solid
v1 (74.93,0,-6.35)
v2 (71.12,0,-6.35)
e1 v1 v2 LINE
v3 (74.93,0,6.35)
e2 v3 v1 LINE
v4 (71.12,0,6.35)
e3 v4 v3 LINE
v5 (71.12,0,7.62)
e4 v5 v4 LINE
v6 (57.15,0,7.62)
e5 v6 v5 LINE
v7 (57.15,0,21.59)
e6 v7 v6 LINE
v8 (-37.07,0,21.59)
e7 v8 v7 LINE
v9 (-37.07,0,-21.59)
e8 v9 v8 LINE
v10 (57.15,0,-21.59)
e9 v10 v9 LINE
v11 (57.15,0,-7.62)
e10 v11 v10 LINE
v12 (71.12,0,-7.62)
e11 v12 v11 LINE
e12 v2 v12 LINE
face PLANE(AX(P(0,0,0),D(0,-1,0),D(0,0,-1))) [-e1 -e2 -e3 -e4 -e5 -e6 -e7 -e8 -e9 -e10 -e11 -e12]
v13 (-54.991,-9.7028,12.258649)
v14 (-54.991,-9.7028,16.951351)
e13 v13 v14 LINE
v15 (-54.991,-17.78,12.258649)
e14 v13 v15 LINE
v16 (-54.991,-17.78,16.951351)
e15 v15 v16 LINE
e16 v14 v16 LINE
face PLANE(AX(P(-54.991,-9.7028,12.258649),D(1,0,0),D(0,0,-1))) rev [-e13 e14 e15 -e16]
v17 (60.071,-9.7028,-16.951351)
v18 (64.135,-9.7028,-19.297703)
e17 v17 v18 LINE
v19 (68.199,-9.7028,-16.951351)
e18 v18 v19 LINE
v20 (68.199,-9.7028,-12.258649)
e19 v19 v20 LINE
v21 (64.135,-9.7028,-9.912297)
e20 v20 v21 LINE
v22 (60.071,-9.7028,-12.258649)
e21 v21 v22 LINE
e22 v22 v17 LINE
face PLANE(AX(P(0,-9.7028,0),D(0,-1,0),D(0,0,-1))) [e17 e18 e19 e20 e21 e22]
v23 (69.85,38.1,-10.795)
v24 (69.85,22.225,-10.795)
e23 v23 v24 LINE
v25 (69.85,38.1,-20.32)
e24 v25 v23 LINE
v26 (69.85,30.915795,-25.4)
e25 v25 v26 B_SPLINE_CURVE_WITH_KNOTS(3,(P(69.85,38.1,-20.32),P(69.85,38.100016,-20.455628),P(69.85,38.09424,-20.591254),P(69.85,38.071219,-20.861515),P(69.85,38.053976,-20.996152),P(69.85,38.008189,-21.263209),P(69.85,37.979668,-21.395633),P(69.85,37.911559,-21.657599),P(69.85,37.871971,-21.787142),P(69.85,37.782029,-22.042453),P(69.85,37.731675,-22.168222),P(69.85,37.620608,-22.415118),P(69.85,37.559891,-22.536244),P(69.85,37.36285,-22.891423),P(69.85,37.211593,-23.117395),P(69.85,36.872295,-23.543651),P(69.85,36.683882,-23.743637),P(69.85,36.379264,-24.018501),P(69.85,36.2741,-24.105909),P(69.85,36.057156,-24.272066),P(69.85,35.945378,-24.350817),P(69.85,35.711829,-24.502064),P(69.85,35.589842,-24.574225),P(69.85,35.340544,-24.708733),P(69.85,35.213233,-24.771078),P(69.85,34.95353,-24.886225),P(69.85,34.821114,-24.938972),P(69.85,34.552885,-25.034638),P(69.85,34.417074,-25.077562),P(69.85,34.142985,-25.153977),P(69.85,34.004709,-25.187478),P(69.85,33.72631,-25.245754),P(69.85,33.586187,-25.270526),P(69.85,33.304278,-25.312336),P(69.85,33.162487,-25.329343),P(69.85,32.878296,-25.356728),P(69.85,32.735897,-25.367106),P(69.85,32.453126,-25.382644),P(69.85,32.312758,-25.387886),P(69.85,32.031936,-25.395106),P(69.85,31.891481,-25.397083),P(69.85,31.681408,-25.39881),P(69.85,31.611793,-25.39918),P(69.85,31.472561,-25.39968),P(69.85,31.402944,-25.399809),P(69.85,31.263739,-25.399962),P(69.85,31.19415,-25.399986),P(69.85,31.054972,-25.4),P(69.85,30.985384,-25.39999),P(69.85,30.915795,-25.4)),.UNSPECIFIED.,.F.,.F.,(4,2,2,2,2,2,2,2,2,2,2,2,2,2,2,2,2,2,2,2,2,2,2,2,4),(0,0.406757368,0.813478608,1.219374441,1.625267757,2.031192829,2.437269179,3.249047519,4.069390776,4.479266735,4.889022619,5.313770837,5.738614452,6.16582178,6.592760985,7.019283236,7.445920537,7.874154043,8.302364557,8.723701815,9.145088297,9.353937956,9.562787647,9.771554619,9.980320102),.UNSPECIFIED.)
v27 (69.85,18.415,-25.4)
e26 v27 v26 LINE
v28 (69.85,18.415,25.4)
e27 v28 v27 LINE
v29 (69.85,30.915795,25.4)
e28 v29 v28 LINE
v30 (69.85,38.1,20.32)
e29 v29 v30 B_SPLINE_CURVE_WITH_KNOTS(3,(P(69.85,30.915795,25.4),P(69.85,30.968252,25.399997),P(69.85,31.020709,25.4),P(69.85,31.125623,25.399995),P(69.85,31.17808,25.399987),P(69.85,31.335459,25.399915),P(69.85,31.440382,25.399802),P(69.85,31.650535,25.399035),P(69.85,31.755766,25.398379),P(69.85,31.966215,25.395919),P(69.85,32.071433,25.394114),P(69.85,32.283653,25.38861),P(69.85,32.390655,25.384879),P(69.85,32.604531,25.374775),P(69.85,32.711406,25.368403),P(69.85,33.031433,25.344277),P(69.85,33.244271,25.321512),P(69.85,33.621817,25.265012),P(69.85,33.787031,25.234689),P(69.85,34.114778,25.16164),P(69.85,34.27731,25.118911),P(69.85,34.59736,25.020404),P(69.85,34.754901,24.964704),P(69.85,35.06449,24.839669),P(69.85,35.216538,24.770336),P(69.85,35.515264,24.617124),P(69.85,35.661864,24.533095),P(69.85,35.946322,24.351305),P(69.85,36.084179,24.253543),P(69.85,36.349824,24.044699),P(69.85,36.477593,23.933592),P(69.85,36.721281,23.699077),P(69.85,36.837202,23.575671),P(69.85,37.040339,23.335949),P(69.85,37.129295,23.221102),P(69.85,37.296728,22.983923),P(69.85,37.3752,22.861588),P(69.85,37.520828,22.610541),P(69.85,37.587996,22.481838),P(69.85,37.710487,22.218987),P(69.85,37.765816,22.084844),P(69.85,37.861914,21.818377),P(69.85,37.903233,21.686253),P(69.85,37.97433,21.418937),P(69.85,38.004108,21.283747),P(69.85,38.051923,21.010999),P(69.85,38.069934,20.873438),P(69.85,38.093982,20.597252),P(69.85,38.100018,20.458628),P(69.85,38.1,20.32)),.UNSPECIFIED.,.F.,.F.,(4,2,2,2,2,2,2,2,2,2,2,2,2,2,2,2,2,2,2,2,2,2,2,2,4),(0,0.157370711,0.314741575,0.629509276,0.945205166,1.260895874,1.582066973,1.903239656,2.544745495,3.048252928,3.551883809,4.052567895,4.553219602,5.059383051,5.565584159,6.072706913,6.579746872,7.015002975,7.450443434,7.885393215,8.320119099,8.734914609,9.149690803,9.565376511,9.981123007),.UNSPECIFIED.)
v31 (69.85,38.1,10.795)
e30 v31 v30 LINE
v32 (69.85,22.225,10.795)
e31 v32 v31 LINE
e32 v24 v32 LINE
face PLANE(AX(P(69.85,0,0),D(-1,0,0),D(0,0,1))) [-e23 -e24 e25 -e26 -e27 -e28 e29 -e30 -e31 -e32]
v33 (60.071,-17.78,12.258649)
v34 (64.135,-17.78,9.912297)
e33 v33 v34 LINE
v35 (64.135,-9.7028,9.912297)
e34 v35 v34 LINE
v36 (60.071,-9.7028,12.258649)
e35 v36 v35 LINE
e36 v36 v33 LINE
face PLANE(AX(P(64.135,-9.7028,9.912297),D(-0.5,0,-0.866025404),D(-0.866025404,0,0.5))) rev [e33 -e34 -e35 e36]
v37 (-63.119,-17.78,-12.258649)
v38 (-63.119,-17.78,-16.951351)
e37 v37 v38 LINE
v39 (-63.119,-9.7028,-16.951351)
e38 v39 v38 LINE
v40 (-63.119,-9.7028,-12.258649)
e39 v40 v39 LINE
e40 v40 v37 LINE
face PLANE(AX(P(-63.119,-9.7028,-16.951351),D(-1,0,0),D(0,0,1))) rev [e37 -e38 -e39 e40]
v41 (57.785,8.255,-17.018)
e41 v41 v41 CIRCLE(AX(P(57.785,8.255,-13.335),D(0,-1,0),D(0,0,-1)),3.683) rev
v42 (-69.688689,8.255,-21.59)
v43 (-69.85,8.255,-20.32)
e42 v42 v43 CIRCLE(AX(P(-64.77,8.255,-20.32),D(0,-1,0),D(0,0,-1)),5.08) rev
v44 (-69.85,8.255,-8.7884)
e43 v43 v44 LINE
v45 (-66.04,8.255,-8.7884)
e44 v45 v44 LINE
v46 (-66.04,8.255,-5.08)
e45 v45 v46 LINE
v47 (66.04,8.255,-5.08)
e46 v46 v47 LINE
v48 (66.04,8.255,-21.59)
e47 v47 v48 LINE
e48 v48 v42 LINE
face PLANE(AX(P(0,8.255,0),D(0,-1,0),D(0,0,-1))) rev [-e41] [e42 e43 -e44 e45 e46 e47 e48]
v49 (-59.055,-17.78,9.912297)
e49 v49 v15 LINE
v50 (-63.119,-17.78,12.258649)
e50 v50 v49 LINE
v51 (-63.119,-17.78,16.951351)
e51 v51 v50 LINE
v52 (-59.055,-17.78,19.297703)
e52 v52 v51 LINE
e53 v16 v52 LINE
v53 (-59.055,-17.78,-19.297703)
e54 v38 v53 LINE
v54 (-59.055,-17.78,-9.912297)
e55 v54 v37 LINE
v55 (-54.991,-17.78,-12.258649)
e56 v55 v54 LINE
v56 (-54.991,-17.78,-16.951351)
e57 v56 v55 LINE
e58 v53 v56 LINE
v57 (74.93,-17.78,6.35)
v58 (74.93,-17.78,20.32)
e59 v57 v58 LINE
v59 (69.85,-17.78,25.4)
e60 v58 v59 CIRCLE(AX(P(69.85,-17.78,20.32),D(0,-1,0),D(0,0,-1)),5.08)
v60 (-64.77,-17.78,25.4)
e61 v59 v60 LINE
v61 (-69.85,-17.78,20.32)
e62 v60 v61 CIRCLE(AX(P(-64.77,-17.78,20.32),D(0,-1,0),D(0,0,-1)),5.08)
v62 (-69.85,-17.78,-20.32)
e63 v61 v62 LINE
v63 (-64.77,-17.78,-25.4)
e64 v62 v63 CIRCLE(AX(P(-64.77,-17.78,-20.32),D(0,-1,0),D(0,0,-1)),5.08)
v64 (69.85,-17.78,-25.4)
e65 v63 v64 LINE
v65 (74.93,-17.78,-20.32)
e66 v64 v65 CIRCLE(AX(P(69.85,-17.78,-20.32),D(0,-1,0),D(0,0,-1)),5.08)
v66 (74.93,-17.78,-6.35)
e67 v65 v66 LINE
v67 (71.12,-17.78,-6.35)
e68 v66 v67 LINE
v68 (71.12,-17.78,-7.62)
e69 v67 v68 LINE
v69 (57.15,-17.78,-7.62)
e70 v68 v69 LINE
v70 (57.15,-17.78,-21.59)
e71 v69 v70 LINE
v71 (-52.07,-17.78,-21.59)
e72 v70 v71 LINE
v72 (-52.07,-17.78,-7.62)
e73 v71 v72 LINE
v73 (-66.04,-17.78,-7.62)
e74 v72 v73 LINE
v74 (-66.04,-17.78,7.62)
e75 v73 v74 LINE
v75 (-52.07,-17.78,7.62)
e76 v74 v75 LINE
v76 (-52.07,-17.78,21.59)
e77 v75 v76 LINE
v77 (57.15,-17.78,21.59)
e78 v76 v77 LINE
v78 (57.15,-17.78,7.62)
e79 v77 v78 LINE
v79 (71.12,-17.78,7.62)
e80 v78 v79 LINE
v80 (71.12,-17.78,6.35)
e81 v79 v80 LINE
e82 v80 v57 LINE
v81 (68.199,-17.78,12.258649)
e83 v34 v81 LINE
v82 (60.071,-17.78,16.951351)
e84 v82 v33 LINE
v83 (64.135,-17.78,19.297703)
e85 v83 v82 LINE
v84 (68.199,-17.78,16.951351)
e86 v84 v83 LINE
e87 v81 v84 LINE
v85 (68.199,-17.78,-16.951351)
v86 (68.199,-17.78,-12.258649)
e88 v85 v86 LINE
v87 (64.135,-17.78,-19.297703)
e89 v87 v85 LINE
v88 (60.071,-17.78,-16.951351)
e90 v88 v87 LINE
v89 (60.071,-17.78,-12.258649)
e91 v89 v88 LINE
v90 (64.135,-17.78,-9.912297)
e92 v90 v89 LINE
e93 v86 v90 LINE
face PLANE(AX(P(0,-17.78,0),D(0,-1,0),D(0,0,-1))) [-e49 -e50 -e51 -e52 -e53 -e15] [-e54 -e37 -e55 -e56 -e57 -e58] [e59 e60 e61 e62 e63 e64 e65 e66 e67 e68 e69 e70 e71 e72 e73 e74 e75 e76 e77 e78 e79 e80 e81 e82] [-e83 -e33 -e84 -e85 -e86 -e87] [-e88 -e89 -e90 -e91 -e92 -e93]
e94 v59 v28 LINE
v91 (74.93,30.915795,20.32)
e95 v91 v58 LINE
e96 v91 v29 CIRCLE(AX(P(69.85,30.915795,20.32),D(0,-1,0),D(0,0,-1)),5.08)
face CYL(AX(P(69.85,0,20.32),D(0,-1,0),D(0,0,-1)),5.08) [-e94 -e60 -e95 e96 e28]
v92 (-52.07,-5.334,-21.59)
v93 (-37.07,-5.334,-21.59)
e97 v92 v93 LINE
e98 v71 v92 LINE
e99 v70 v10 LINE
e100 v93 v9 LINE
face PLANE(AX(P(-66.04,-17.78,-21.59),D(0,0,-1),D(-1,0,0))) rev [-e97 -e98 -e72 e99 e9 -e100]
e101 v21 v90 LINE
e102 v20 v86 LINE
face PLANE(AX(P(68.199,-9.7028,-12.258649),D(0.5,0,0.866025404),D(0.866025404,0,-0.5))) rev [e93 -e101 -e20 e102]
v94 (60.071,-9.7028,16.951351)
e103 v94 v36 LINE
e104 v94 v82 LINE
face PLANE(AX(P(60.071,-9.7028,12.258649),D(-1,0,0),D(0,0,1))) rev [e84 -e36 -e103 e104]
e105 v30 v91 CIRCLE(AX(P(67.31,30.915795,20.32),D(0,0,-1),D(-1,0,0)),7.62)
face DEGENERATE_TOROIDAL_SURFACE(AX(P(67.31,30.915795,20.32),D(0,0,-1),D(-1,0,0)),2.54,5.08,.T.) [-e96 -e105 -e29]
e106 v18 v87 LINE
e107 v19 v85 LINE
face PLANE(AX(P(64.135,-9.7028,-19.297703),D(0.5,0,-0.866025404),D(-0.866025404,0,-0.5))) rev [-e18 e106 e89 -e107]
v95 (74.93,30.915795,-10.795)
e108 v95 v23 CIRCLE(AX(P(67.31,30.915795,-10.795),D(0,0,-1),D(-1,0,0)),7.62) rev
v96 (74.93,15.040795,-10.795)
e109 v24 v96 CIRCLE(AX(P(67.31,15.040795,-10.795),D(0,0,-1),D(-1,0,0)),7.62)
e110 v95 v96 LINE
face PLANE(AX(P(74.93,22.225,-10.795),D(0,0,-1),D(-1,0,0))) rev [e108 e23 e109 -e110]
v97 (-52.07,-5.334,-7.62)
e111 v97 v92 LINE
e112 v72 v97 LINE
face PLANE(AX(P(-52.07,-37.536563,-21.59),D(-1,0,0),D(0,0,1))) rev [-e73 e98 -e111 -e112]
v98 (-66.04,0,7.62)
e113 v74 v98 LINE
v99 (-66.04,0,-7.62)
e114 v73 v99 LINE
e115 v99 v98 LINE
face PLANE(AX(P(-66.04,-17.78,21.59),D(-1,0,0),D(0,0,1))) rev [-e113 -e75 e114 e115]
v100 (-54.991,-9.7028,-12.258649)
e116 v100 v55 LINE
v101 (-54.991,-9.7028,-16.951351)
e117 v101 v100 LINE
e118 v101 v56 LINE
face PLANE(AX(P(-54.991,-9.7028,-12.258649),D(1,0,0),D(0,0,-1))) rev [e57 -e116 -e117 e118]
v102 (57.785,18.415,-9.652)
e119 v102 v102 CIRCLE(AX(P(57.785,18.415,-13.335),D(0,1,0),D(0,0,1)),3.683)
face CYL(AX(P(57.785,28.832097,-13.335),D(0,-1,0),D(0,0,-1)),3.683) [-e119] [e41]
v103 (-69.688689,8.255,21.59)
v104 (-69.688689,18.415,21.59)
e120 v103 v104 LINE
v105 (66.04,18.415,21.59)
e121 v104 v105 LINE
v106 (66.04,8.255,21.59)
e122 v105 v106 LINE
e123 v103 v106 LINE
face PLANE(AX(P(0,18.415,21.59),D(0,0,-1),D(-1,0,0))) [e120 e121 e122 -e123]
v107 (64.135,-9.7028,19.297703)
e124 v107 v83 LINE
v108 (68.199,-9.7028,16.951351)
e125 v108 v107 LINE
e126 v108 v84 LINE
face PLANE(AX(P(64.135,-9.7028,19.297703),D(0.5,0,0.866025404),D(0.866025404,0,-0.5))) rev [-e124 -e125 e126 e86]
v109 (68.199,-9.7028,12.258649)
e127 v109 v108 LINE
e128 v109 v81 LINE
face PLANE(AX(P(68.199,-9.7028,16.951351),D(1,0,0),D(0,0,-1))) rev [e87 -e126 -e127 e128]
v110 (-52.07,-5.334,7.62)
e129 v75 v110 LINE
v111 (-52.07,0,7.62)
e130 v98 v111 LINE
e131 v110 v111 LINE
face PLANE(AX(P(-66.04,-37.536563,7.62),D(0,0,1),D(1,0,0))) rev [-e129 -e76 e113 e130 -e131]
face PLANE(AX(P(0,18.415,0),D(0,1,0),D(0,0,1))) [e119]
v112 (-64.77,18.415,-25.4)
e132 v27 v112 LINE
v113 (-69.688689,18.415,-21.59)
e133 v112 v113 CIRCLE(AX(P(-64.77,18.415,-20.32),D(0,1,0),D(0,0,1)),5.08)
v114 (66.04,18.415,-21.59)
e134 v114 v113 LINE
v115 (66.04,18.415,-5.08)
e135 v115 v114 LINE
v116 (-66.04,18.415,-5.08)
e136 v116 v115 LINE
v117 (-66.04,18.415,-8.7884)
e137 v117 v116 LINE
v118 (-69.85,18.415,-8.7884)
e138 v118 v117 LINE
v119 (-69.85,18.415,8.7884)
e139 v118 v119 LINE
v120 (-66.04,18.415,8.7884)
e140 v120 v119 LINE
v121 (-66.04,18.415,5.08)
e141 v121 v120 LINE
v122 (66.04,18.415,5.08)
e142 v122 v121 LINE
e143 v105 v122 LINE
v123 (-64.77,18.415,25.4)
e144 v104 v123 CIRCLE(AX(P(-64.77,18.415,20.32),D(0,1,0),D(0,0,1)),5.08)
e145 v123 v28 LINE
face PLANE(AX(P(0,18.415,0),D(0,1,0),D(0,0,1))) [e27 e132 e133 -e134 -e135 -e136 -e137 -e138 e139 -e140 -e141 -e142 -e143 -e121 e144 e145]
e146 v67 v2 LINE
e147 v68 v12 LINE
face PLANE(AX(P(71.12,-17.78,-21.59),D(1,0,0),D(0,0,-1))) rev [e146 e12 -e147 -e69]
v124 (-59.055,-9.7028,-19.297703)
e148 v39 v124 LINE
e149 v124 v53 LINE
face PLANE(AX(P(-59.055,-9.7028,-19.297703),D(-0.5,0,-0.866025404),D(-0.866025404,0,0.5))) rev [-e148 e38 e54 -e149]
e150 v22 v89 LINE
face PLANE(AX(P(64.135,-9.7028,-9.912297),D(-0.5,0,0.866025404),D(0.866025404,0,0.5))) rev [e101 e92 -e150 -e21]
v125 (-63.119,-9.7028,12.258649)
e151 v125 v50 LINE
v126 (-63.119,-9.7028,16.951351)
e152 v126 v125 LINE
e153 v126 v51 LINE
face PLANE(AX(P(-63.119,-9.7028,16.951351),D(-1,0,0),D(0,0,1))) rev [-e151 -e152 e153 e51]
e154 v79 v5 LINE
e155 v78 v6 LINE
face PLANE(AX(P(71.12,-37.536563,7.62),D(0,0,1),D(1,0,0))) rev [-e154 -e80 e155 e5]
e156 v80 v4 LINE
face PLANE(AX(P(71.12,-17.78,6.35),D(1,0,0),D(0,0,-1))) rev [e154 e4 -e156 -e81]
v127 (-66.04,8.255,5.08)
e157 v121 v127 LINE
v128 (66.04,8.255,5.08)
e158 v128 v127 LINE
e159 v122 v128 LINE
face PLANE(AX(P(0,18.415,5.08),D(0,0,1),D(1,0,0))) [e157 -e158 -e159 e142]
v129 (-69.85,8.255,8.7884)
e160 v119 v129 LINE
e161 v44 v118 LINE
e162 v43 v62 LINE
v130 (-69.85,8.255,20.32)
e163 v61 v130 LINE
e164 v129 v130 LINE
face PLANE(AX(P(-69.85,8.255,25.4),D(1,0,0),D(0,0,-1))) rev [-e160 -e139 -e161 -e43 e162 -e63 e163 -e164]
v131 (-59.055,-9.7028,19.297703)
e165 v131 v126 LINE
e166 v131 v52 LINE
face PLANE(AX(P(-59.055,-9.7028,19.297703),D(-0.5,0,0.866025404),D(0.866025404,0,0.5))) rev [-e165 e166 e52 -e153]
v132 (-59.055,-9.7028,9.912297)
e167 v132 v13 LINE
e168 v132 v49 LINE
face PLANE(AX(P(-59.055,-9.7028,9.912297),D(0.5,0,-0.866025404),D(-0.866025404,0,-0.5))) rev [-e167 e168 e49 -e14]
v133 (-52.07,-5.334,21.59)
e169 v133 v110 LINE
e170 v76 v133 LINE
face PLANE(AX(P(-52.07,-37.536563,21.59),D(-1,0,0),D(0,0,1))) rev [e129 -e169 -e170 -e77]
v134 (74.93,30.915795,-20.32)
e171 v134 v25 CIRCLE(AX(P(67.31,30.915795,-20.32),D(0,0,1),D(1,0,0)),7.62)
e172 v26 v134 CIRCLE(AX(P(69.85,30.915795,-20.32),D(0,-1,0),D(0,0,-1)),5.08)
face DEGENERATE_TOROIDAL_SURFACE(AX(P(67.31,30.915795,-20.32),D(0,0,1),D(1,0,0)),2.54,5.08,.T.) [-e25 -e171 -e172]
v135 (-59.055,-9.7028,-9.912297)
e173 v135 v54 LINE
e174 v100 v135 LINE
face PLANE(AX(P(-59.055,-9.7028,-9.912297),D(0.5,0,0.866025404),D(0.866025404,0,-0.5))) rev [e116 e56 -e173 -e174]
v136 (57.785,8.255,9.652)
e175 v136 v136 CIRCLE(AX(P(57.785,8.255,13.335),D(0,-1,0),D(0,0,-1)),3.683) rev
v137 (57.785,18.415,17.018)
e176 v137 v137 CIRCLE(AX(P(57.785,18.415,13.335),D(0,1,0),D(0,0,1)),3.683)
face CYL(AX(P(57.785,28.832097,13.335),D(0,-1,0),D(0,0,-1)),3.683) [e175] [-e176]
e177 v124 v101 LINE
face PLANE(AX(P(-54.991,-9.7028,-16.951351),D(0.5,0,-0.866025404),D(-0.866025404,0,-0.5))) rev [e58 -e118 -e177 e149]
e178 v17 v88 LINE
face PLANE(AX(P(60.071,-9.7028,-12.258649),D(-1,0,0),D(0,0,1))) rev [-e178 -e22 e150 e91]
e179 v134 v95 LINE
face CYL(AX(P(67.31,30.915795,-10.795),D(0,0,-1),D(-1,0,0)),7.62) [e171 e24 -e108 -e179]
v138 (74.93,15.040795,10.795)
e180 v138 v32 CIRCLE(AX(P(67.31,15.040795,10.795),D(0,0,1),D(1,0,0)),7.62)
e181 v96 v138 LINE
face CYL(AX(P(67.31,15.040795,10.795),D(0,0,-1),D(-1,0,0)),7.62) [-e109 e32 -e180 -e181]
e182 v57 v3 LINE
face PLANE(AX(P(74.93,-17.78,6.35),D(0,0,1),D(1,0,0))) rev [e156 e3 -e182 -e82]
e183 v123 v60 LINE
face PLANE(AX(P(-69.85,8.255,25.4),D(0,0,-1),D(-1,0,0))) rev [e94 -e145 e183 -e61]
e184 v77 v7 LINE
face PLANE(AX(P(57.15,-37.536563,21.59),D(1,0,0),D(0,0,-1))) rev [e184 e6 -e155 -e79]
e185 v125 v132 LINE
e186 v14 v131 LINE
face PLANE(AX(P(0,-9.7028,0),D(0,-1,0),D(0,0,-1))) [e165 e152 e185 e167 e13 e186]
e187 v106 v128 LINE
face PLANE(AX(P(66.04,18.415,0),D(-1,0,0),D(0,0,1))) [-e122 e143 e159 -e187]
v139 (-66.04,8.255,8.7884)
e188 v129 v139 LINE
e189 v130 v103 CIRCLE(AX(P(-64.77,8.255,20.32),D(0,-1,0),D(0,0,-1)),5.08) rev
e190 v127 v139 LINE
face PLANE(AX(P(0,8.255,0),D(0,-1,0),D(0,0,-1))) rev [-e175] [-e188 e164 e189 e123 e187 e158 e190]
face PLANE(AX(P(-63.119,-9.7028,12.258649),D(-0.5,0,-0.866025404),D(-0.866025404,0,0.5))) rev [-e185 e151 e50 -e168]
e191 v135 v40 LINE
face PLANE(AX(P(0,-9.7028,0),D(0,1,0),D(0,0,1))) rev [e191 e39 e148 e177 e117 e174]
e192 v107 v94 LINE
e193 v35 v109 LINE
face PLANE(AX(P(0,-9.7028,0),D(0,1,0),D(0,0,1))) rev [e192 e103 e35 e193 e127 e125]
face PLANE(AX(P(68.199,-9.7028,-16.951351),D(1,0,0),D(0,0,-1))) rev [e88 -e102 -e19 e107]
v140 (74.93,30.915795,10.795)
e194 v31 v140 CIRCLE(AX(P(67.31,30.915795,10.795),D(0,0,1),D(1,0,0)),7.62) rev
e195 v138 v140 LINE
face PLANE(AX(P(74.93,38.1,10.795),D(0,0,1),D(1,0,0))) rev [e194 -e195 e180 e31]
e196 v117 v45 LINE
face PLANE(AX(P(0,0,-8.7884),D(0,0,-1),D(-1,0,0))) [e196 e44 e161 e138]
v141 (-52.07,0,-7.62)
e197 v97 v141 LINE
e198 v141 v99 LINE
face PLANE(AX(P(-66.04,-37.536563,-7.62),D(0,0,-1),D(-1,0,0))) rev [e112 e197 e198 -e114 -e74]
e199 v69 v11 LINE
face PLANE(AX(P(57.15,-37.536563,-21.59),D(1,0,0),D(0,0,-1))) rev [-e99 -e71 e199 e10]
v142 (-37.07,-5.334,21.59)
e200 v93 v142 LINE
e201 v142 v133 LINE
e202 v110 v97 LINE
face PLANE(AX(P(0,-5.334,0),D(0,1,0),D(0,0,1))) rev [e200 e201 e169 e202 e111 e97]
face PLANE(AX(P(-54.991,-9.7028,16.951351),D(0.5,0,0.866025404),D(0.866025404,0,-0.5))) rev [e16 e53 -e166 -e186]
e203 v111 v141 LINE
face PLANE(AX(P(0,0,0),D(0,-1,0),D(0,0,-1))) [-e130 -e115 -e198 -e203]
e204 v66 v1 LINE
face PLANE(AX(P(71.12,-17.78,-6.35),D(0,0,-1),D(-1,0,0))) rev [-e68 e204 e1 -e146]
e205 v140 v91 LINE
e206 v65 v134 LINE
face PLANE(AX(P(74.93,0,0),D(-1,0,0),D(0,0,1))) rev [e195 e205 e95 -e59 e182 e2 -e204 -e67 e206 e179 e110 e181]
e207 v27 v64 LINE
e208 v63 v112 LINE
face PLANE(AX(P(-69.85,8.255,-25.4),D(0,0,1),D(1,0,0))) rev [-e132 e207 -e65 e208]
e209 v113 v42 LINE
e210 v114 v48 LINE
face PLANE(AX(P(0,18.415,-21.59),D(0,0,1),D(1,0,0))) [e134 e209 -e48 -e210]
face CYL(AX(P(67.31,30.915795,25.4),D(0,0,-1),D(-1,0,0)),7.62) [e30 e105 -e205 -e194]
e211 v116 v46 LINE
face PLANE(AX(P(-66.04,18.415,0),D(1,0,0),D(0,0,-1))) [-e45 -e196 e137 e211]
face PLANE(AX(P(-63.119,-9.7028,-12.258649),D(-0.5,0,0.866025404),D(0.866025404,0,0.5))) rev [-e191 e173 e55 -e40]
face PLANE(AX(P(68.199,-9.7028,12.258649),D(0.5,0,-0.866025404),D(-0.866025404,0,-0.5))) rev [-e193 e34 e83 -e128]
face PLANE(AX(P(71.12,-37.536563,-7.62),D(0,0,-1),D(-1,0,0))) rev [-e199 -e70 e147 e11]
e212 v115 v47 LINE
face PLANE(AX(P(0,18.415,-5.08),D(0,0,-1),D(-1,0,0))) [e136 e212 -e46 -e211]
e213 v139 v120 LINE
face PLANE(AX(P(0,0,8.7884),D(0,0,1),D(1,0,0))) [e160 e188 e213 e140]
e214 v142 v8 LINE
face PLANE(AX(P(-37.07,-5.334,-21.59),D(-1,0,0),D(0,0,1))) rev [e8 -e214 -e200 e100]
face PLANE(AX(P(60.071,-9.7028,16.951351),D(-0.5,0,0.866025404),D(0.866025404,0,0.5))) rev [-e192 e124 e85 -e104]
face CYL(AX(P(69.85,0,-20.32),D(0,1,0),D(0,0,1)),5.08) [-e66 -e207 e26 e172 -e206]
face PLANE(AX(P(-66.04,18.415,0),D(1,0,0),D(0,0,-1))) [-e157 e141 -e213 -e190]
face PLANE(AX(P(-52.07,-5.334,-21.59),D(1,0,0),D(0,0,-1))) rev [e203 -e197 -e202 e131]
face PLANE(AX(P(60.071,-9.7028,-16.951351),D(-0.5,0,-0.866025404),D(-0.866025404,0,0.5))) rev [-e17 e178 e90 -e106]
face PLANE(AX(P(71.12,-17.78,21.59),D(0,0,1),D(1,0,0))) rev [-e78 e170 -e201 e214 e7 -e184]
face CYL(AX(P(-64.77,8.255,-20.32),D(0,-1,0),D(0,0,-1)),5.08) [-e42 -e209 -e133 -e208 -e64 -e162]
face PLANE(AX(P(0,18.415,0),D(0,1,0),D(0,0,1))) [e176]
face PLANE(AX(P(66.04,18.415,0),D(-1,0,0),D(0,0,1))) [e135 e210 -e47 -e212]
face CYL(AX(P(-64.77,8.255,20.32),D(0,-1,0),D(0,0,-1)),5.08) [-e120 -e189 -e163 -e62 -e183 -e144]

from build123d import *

# Parameters (mm, degrees)
SKETCH1_W              = 139.7
SKETCH1_H              = 50.8
BASE_DEPTH             = 8.255
MECHANISM_WALLS_DEPTH  = 10.16
SKETCH4_R              = 3.683
SPRING_CYLINDERS_DEPTH = 10.16
WALL_DEPTH             = 5.08
CIRCUIT_WALLS_DEPTH    = 17.78
SKETCH8_W              = 13.97
SKETCH8_H              = 13.97
MAGNET_JUNCTIONS_DEPTH = 17.78
MAGNET_HOLES_DEPTH     = 8.0772
SKETCH10_W             = 15
SKETCH10_H             = 43.18
BOSS_EXTRUDE1_DEPTH    = 5.334
FILLET1_R              = 7.62
FILLET2_R              = 5.08
FILLET4_R              = 7.62
FILLET5_R              = 5.08
SKETCH11_W             = 3.81
SKETCH11_H             = 10.16
CUT_EXTRUDE1_DEPTH     = 0.1016
SKETCH12_W             = 17.160016071
SKETCH12_H             = 10.16
CUT_EXTRUDE2_DEPTH     = 0.1016


# Some blends are built 0.0001 mm under size
with BuildPart() as part:
    # Sketch1 → base (new body)
    with BuildSketch(Plane(origin=(0, 0, 0), x_dir=(1, 0, 0), z_dir=(0, 1, 0))):
        Rectangle(SKETCH1_W, SKETCH1_H)
    extrude(amount=BASE_DEPTH)

    # Sketch3 → mechanism walls (add)
    with BuildSketch(Plane(origin=(0, 8.255, 0), x_dir=(1, 0, 0), z_dir=(0, 1, 0))):
        Polygon((69.85, 25.4), (-69.85, 25.4), (-69.85, 21.59), (66.04, 21.59), (66.04, 5.08), (-66.04, 5.08), (-66.04, 8.89), (-69.85, 8.89), (-69.85, -8.89), (-66.04, -8.89), (-66.04, -5.08), (66.04, -5.08), (66.04, -21.59), (-69.85, -21.59), (-69.85, -25.4), (69.85, -25.4), align=None)
    extrude(amount=MECHANISM_WALLS_DEPTH)

    # Sketch4 → spring cylinders (add)
    with BuildSketch(Plane(origin=(0, 8.255, 0), x_dir=(1, 0, 0), z_dir=(0, 1, 0))):
        with Locations(Location((57.785, 13.335, 0), (0, 0, 90))):
            Circle(SKETCH4_R)
        with Locations(Location((57.785, -13.335, 0), (0, 0, 90))):
            Circle(SKETCH4_R)
    extrude(amount=SPRING_CYLINDERS_DEPTH)

    # Sketch6 → wall (add)
    with BuildSketch(Plane(origin=(69.85, 0, 0), x_dir=(0, 0, -1), z_dir=(1, 0, 0))):
        Polygon((-25.4, 0), (25.4, 0), (25.4, 38.1), (10.795, 38.1), (10.795, 22.225), (-10.795, 22.225), (-10.795, 38.1), (-25.4, 38.1), align=None)
    extrude(amount=WALL_DEPTH)

    # Sketch7 → circuit walls (add)
    with BuildSketch(Plane.XZ):
        Polygon((74.93, 25.4), (74.93, 6.35), (71.12, 6.35), (71.12, 21.59), (-66.04, 21.59), (-66.04, -21.59), (71.12, -21.59), (71.12, -6.35), (74.93, -6.35), (74.93, -25.4), (-69.85, -25.4), (-69.85, 25.4), align=None)
    extrude(amount=CIRCUIT_WALLS_DEPTH)

    # Sketch8 → magnet junctions (add)
    with BuildSketch(Plane.XZ):
        with Locations((-59.055, 14.605)):
            Rectangle(SKETCH8_W, SKETCH8_H)
        with Locations((-59.055, -14.605)):
            Rectangle(SKETCH8_W, SKETCH8_H)
        with Locations((64.135, -14.605)):
            Rectangle(SKETCH8_W, SKETCH8_H)
        with Locations((64.135, 14.605)):
            Rectangle(SKETCH8_W, SKETCH8_H)
    extrude(amount=MAGNET_JUNCTIONS_DEPTH)

    # Sketch9 → magnet holes (cut)
    with BuildSketch(Plane.XZ.offset(17.78)):
        Polygon((-59.055, 19.297702988), (-63.119, 16.951351494), (-63.119, 12.258648506), (-59.055, 9.912297012), (-54.991, 12.258648506), (-54.991, 16.951351494), align=None)
        Polygon((-63.119, -12.258648506), (-59.055, -9.912297012), (-54.991, -12.258648506), (-54.991, -16.951351494), (-59.055, -19.297702988), (-63.119, -16.951351494), align=None)
        Polygon((64.135, 9.912297012), (60.071, 12.258648506), (60.071, 16.951351494), (64.135, 19.297702988), (68.199, 16.951351494), (68.199, 12.258648506), align=None)
        Polygon((64.135, -19.297702988), (68.199, -16.951351494), (68.199, -12.258648506), (64.135, -9.912297012), (60.071, -12.258648506), (60.071, -16.951351494), align=None)
    extrude(amount=-MAGNET_HOLES_DEPTH, mode=Mode.SUBTRACT)

    # Sketch10 → Boss-Extrude1 (add)
    with BuildSketch(Plane.XZ):
        with Locations((-44.57, 0)):
            Rectangle(SKETCH10_W, SKETCH10_H)
    extrude(amount=BOSS_EXTRUDE1_DEPTH)

    # Fillet1
    # the kernel refuses this fillet: 7.62 mm, written as the material it takes off along each edge
    with BuildSketch(Plane(origin=(74.93, 38.1, -43.360512242), x_dir=(0, -1, 0), z_dir=(0, 0, 1))) as fillet1_piece_1:
        with BuildLine():
            CenterArc((7.184204897, -7.62), FILLET1_R, 90, 70.528779366)
            Line((0, -5.08), (-0.143684098, -5.0292))
            ThreePointArc((-0.143684098, -5.0292), (-0.1524, -2.54), (-0.1524, 0))
            Line((-0.1524, 0), (0, 0.1524))
            Line((0, 0.1524), (7.184204897, 0.1524))
            Line((7.184204897, 0.1524), (7.184204897, 0))
        make_face()
    extrude(amount=50.526024484, mode=Mode.SUBTRACT)
    with BuildSketch(Plane(origin=(74.93, 38.1, -7.165512242), x_dir=(-1, 0, 0), z_dir=(0, 0, 1))) as fillet1_piece_2:
        with BuildLine():
            CenterArc((7.62, 7.184204897), FILLET1_R, 180, 70.528779366)
            Line((0, 7.184204897), (-0.1524, 7.184204897))
            Line((-0.1524, 7.184204897), (-0.1524, 0))
            Line((-0.1524, 0), (0, -0.1524))
            ThreePointArc((0, -0.1524), (2.54, -0.1524), (5.0292, -0.143684098))
            Line((5.0292, -0.143684098), (5.08, 0))
        make_face()
    extrude(amount=50.526024484, mode=Mode.SUBTRACT)

    # Fillet2
    fillet2_edges = [part.edges().sort_by_distance(p)[0] for p in [
        (74.93, 6.567897552, 25.4),
        (73.531703947, 35.315204154, -25.4),
        (73.531703947, 35.315204154, 25.4),
        (74.93, 6.567897552, -25.4),
    ]]
    fillet(fillet2_edges, radius=FILLET2_R - 0.0001)  # a hair under: the kernel refuses the full size

    # Fillet4
    # the kernel refuses this fillet: 7.62 mm, written as the material it takes off along each edge
    with BuildSketch(Plane(origin=(74.93, 22.225, -10.795), x_dir=(0, -1, 0), z_dir=(0, 0, 1))) as fillet4_piece_1:
        with BuildLine():
            CenterArc((7.184204897, -7.62), FILLET4_R, 90, 70.528779366)
            Line((0, -5.08), (-0.143684098, -5.0292))
            ThreePointArc((-0.143684098, -5.0292), (-0.1524, -2.54), (-0.1524, 0))
            Line((-0.1524, 0), (0, 0.1524))
            Line((0, 0.1524), (7.184204897, 0.1524))
            Line((7.184204897, 0.1524), (7.184204897, 0))
        make_face()
    extrude(amount=21.59, mode=Mode.SUBTRACT)

    # Fillet5
    fillet5_edges = [part.edges().sort_by_distance(p)[0] for p in [
        (-69.85, 0.3175, -25.4),
        (-69.85, 0.3175, 25.4),
    ]]
    fillet(fillet5_edges, radius=FILLET5_R)

    # Sketch11 → Cut-Extrude1 (cut)
    with BuildSketch(Plane.XY.offset(8.89)):
        with Locations((-67.945, 13.335)):
            Rectangle(SKETCH11_W, SKETCH11_H)
    extrude(amount=-CUT_EXTRUDE1_DEPTH, mode=Mode.SUBTRACT)

    # Sketch12 → Cut-Extrude2 (cut)
    with BuildSketch(Plane(origin=(0, 0, -8.89), x_dir=(-1, 0, 0), z_dir=(0, 0, -1))):
        with Locations((74.620008036, 13.335)):
            Rectangle(SKETCH12_W, SKETCH12_H)
    extrude(amount=-CUT_EXTRUDE2_DEPTH, mode=Mode.SUBTRACT)


solid = part.part
